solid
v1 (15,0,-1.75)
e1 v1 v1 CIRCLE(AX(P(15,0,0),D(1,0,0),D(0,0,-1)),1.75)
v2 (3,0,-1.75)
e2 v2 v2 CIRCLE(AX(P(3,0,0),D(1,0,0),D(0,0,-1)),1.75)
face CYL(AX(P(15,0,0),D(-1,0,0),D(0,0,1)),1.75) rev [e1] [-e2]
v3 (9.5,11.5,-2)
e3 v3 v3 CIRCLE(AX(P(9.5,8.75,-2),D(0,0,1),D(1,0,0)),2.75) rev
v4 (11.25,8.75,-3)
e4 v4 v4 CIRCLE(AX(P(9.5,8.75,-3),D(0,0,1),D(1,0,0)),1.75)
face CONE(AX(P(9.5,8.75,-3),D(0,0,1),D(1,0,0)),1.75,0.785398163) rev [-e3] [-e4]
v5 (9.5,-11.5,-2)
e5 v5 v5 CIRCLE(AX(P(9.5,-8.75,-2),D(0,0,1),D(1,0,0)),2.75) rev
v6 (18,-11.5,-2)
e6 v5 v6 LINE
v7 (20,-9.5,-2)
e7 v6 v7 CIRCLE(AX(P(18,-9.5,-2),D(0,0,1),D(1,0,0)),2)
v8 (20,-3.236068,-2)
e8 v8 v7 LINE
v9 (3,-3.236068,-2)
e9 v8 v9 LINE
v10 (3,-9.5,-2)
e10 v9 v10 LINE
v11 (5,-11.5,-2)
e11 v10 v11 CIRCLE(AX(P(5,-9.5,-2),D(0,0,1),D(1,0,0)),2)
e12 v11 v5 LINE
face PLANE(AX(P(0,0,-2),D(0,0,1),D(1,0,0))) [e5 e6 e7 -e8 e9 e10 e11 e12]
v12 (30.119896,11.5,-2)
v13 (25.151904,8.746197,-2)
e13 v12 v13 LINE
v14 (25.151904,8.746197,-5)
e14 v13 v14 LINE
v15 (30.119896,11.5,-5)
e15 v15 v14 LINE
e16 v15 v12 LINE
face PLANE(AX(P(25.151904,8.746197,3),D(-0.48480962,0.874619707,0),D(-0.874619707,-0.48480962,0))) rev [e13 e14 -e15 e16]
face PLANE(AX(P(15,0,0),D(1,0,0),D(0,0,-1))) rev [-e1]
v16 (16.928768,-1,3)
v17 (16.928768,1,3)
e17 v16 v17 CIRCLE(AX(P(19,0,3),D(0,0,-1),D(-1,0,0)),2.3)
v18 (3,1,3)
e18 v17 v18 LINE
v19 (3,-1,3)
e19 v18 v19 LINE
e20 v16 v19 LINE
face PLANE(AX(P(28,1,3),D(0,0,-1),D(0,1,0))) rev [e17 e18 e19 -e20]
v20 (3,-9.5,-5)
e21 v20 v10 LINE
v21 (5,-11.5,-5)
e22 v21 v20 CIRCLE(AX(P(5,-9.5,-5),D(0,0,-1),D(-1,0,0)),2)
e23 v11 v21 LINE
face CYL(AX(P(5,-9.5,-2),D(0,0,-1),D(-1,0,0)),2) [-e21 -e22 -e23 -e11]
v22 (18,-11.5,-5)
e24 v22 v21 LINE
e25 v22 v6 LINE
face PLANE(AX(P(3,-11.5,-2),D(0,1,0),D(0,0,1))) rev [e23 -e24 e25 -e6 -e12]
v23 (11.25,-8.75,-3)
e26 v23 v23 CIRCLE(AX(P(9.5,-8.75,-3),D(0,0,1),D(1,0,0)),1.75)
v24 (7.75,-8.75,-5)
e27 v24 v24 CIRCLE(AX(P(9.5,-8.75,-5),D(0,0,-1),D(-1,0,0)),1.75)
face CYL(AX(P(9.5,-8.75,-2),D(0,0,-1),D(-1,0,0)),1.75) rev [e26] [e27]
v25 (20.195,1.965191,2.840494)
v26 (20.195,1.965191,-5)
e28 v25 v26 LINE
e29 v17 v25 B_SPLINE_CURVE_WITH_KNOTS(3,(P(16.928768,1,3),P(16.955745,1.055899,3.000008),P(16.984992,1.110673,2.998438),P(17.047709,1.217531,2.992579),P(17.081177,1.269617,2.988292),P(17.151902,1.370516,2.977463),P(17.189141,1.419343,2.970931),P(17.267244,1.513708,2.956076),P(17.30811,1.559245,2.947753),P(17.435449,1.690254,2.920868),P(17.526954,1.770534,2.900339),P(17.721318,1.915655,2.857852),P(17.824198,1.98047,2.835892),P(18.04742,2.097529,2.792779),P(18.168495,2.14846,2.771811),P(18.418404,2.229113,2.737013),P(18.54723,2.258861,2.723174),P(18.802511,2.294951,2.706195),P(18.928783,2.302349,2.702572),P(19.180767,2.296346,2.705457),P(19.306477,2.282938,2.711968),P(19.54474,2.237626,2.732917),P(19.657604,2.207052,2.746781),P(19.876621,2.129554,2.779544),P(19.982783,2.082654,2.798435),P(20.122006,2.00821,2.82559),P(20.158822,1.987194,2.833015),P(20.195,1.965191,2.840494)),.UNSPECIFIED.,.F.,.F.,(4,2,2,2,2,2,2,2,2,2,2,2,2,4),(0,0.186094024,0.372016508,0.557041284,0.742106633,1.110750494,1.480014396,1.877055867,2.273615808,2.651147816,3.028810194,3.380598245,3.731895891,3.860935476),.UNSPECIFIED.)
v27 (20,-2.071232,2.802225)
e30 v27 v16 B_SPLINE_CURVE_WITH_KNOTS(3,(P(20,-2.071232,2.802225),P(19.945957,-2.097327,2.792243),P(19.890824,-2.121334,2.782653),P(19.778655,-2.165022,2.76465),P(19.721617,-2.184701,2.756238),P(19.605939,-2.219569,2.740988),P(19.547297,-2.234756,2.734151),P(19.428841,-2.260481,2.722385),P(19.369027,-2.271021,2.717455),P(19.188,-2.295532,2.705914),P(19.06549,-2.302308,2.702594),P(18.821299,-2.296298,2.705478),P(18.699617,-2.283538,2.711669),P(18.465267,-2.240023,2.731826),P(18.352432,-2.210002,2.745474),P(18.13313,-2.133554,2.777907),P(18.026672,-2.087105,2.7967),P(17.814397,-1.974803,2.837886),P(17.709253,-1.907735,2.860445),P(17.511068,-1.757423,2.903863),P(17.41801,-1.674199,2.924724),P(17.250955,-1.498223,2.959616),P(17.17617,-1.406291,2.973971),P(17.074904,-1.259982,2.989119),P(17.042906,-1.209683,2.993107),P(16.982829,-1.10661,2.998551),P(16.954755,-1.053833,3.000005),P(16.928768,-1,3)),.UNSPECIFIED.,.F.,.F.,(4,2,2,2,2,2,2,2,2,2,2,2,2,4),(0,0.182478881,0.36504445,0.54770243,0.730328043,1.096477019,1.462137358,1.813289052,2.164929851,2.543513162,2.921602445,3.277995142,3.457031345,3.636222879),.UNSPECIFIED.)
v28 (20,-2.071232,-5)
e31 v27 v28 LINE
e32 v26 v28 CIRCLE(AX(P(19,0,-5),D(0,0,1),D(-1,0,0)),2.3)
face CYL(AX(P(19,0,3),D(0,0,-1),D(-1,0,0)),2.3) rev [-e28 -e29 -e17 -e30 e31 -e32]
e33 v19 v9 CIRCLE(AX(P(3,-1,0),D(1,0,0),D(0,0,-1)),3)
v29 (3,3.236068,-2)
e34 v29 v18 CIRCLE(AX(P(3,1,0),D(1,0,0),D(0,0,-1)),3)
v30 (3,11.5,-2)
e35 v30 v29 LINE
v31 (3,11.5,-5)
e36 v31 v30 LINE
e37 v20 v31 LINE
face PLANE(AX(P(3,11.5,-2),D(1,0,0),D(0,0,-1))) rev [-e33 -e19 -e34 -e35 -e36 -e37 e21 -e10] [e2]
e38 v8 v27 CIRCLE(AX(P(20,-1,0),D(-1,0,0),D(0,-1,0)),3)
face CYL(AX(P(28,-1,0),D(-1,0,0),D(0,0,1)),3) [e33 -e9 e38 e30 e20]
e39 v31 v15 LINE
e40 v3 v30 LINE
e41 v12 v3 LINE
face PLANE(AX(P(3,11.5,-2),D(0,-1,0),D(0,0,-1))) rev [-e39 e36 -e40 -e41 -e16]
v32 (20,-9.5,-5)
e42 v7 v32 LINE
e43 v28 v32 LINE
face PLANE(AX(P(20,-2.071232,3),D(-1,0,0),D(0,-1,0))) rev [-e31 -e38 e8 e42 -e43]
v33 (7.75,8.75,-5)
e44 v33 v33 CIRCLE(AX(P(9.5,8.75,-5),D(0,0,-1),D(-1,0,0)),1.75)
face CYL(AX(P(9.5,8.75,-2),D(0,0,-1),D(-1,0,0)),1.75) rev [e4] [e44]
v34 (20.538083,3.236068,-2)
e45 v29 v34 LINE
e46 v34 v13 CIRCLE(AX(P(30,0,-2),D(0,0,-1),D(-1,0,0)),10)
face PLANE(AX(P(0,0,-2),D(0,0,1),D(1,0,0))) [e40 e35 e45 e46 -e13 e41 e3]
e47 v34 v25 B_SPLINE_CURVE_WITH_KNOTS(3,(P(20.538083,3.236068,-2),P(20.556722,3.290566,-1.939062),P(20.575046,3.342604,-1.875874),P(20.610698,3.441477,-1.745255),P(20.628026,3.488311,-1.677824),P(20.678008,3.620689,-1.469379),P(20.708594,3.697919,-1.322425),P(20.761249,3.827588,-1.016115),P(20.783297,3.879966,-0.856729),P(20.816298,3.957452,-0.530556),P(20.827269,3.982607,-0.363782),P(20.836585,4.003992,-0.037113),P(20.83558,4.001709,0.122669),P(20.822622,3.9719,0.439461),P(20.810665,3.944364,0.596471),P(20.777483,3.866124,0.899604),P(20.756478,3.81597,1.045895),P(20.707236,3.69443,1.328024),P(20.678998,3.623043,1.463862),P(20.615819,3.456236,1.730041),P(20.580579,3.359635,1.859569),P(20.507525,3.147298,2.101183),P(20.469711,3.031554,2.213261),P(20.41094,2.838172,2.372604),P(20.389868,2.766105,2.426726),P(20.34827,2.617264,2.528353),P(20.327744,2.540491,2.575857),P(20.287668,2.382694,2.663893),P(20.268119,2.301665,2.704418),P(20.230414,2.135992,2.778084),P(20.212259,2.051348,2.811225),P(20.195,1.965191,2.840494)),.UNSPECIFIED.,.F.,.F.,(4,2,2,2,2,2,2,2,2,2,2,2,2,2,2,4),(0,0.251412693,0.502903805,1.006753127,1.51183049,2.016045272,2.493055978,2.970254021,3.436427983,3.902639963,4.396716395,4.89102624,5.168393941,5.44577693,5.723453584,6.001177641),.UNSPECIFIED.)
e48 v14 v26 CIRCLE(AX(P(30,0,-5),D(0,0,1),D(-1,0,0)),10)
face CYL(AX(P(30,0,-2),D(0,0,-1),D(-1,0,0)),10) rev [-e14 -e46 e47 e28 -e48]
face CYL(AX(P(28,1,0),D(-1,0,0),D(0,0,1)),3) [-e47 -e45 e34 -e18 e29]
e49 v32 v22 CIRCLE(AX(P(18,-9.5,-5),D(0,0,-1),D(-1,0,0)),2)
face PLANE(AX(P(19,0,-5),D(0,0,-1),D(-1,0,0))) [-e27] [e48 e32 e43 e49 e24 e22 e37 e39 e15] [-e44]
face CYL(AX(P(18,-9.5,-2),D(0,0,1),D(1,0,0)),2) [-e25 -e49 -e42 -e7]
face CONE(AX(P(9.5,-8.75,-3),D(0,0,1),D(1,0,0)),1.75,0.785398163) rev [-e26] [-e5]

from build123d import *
from build123d.topology import SkipClean

# Parameters (mm, degrees)
CROQUIS3_W              = 38
CROQUIS3_H              = 23
CROQUIS3_R              = 1.75
SALIENTE_EXTRUIR1_DEPTH = 1
SALIENTE_EXTRUIR2_DEPTH = 25
SALIENTE_EXTRUIR4_DEPTH = 40
SALIENTE_EXTRUIR5_DEPTH = 6
CORTAR_EXTRUIR3_DEPTH   = 65.46296637
CROQUIS5_R              = 1.75
CORTAR_EXTRUIR1_DEPTH   = 12
CROQUIS11_R             = 1.75
CORTAR_EXTRUIR4_DEPTH   = 58.245149126
CORTAR_EXTRUIR5_DEPTH   = 58.134007224
REDONDEO1_R             = 2
SALIENTE_EXTRUIR6_START = 2
CROQUIS13_R             = 1.75
SALIENTE_EXTRUIR6_DEPTH = 2
CHAFL_N1_SIZE           = 1
CORTAR_EXTRUIR6_DEPTH   = 64.102925108
SALIENTE_EXTRUIR7_DEPTH = 3


with BuildPart() as part:
    # Croquis3 → Saliente-Extruir1 (new body)
    with BuildSketch(Plane.XY.offset(-3)):
        with Locations((22, 0)):
            Rectangle(CROQUIS3_W, CROQUIS3_H)
        with Locations((9.5, 8.75)):
            Circle(CROQUIS3_R, mode=Mode.SUBTRACT)
        with Locations((9.5, -8.75)):
            Circle(CROQUIS3_R, mode=Mode.SUBTRACT)
        with BuildLine():
            ThreePointArc((20.184659091, -1.912872928), (40, 0), (20.184659091, 1.912872928))
            ThreePointArc((20.184659091, 1.912872928), (16.75, 0), (20.184659091, -1.912872928))
        make_face(mode=Mode.SUBTRACT)
    extrude(amount=SALIENTE_EXTRUIR1_DEPTH)

    # Croquis4 → Saliente-Extruir2 (add)
    with BuildSketch(Plane(origin=(3, 0, 0), x_dir=(0, 0, -1), z_dir=(1, 0, 0))):
        with BuildLine():
            Line((3, 1), (3, -1))
            ThreePointArc((3, -1), (0, -4), (-3, -1))
            Line((-3, -1), (-3, 1))
            ThreePointArc((-3, 1), (0, 4), (3, 1))
        make_face()
    extrude(amount=SALIENTE_EXTRUIR2_DEPTH)



with BuildPart() as body_2:
    # Croquis8 → Saliente-Extruir4 (new body)
    with BuildSketch(Plane(origin=(49, 0, 0), x_dir=(0.8746197071393935, 0.48480962024634133, 0), z_dir=(-0.48480962024634133, 0.8746197071393935, 0))):
        with BuildLine():
            Line((-1, 3), (1, 3))
            ThreePointArc((1, 3), (4, 0), (1, -3))
            Line((1, -3), (-1, -3))
            ThreePointArc((-1, -3), (-4, 0), (-1, 3))
        make_face()
    extrude(amount=SALIENTE_EXTRUIR4_DEPTH)


with BuildPart() as part_1:
    add(part.part)

    add(body_2.part)  # Saliente-Extruir5 merges body 2
    # Croquis9 → Saliente-Extruir5 (add)
    with BuildSketch(Plane.XY.offset(-3)):
        with BuildLine():
            Line((25.151903798, 8.746197071), (39.686136808, 16.802653985))
            Line((39.686136808, 16.802653985), (36.292469466, 22.924991935))
            Line((36.292469466, 22.924991935), (21.758236456, 14.868535021))
            ThreePointArc((21.758236456, 14.868535021), (15.352304272, 8.62815217), (13, 0))
            Line((13, 0), (20, 0))
            ThreePointArc((20, 0), (21.383708396, 5.07538363), (25.151903798, 8.746197071))
        make_face()
    extrude(amount=SALIENTE_EXTRUIR5_DEPTH)

    # Croquis10 → Cortar-Extruir3 (cut, through all)
    with BuildSketch(Plane(origin=(0, 0, -3), x_dir=(-1, 0, 0), z_dir=(0, 0, -1))):
        with BuildLine():
            Line((-54.752227431, 25.153924387), (-25.151903798, 8.746197071))
            ThreePointArc((-25.151903798, 8.746197071), (-21.926969684, 5.901371155), (-20.195, 1.96519083))
            ThreePointArc((-20.195, 1.96519083), (-16.702679258, 0.110983813), (-20, -2.071231518))
            Line((-20, -2.071231518), (-20, -15.393420546))
            Line((-20, -15.393420546), (-54.752227431, -15.393420546))
            Line((-54.752227431, -15.393420546), (-54.752227431, 25.153924387))
        make_face()
    extrude(amount=-CORTAR_EXTRUIR3_DEPTH, mode=Mode.SUBTRACT)

    # Croquis5 → Cortar-Extruir1 (cut)
    with BuildSketch(Plane(origin=(3, 0, 0), x_dir=(0, 0, -1), z_dir=(1, 0, 0))):
        Circle(CROQUIS5_R)
    extrude(amount=CORTAR_EXTRUIR1_DEPTH, mode=Mode.SUBTRACT)

    # Croquis11 → Cortar-Extruir4 (cut, through all)
    with BuildSketch(Plane(origin=(-7.875406784, 14.20760993, 0), x_dir=(0.8746197071393934, 0.4848096202463414, 0), z_dir=(-0.48480962024634144, 0.8746197071393935, 0))):
        with Locations(Location((42.85636565, 0, 0), (0, 0, 180))):
            Circle(CROQUIS11_R)
    extrude(amount=-CORTAR_EXTRUIR4_DEPTH, mode=Mode.SUBTRACT)

    # Croquis12 → Cortar-Extruir5 (cut, through all)
    with BuildSketch(Plane(origin=(0, 0, -3), x_dir=(-1, 0, 0), z_dir=(0, 0, -1))):
        Polygon((-41.818249172, 31.029855201), (-23.89343012, 27.219817295), (-26.84914243, 44.519393877), align=None)
    extrude(amount=-CORTAR_EXTRUIR5_DEPTH, mode=Mode.SUBTRACT)

    # Redondeo1
    redondeo1_edges = [part_1.edges().sort_by_distance(p)[0] for p in [
        (20, -11.5, -2.5),
        (3, 11.5, -2.5),
        (3, -11.5, -2.5),
    ]]
    fillet(redondeo1_edges, radius=REDONDEO1_R)

    # Croquis13 → Saliente-Extruir6 (add)
    with SkipClean():  # the faces are left unmerged after this step: merging them gives an invalid solid
        with BuildSketch(Plane(origin=(0, 0, -3), x_dir=(-1, 0, 0), z_dir=(0, 0, -1)).offset(SALIENTE_EXTRUIR6_START)):
            with BuildLine():
                Line((-20, -2.071231518), (-20, -9.5))
                ThreePointArc((-20, -9.5), (-19.414213562, -10.914213562), (-18, -11.5))
                Line((-18, -11.5), (-5, -11.5))
                ThreePointArc((-5, -11.5), (-3.585786438, -10.914213562), (-3, -9.5))
                Line((-3, -9.5), (-3, 9.5))
                ThreePointArc((-3, 9.5), (-3.585786438, 10.914213562), (-5, 11.5))
                Line((-5, 11.5), (-17.480015974, 11.5))
                ThreePointArc((-17.480015974, 11.5), (-19.483379935, 13.35667258), (-21.758236456, 14.868535021))
                Line((-21.758236456, 14.868535021), (-35.417849759, 22.440182315))
                Line((-35.417849759, 22.440182315), (-31.832998763, 28.907424707))
                Line((-31.832998763, 28.907424707), (-33.878680529, 29.342247789))
                Line((-33.878680529, 29.342247789), (-40.560756515, 17.287463605))
                Line((-40.560756515, 17.287463605), (-25.151903798, 8.746197071))
                ThreePointArc((-25.151903798, 8.746197071), (-21.926969684, 5.901371155), (-20.195, 1.96519083))
                ThreePointArc((-20.195, 1.96519083), (-16.702679258, 0.110983813), (-20, -2.071231518))
            make_face()
            with Locations((-9.5, -8.75)):
                Circle(CROQUIS13_R, mode=Mode.SUBTRACT)
            with Locations((-9.5, 8.75)):
                Circle(CROQUIS13_R, mode=Mode.SUBTRACT)
        extrude(amount=-SALIENTE_EXTRUIR6_DEPTH)

    # Chaflán1
    chafl_n1_edges = [part_1.edges().sort_by_distance(p)[0] for p in [
        (7.75, 8.75, -2),
        (7.75, -8.75, -2),
    ]]
    chamfer(chafl_n1_edges, length=CHAFL_N1_SIZE - 0.0001)  # a hair under: the kernel refuses the full size

    # Croquis14 → Cortar-Extruir6 (cut, through all)
    with BuildSketch(Plane(origin=(3, 0.024746159, -35.327414791), x_dir=(0, 0, 1), z_dir=(-1, 0, 0))):
        with BuildLine():
            ThreePointArc((-38.672585209, 3.211321818), (-41.89733008, 3.713866628), (-43.672585209, 0.975253841))
            Line((-43.672585209, 0.975253841), (-43.672585209, 29.969736253))
            Line((-43.672585209, 29.969736253), (-35.672585209, 29.969736253))
            Line((-35.672585209, 29.969736253), (-35.672585209, 11.475253841))
            Line((-35.672585209, 11.475253841), (-38.672585209, 11.475253841))
            Line((-38.672585209, 11.475253841), (-38.672585209, 3.211321818))
        make_face()
        with BuildLine():
            Line((30.327414791, 11.475253841), (33.327414791, 11.475253841))
            Line((33.327414791, 11.475253841), (33.327414791, 9.475253841))
            Line((33.327414791, 9.475253841), (33.327414791, 3.211321818))
            ThreePointArc((33.327414791, 3.211321818), (36.552159663, 3.713866628), (38.327414791, 0.975253841))
            Line((38.327414791, 0.975253841), (38.327414791, 29.969736253))
            Line((38.327414791, 29.969736253), (30.327414791, 29.969736253))
            Line((30.327414791, 29.969736253), (30.327414791, 11.475253841))
        make_face()
    extrude(amount=-CORTAR_EXTRUIR6_DEPTH, mode=Mode.SUBTRACT)

    # Croquis15 → Saliente-Extruir7 (add)
    with BuildSketch(Plane.XY.offset(-2)):
        with BuildLine():
            Line((3, 9.5), (3, 11.5))
            Line((3, 11.5), (5, 11.5))
            ThreePointArc((5, 11.5), (3.585786438, 10.914213562), (3, 9.5))
        make_face()
    extrude(amount=-SALIENTE_EXTRUIR7_DEPTH)


solid = part_1.part
